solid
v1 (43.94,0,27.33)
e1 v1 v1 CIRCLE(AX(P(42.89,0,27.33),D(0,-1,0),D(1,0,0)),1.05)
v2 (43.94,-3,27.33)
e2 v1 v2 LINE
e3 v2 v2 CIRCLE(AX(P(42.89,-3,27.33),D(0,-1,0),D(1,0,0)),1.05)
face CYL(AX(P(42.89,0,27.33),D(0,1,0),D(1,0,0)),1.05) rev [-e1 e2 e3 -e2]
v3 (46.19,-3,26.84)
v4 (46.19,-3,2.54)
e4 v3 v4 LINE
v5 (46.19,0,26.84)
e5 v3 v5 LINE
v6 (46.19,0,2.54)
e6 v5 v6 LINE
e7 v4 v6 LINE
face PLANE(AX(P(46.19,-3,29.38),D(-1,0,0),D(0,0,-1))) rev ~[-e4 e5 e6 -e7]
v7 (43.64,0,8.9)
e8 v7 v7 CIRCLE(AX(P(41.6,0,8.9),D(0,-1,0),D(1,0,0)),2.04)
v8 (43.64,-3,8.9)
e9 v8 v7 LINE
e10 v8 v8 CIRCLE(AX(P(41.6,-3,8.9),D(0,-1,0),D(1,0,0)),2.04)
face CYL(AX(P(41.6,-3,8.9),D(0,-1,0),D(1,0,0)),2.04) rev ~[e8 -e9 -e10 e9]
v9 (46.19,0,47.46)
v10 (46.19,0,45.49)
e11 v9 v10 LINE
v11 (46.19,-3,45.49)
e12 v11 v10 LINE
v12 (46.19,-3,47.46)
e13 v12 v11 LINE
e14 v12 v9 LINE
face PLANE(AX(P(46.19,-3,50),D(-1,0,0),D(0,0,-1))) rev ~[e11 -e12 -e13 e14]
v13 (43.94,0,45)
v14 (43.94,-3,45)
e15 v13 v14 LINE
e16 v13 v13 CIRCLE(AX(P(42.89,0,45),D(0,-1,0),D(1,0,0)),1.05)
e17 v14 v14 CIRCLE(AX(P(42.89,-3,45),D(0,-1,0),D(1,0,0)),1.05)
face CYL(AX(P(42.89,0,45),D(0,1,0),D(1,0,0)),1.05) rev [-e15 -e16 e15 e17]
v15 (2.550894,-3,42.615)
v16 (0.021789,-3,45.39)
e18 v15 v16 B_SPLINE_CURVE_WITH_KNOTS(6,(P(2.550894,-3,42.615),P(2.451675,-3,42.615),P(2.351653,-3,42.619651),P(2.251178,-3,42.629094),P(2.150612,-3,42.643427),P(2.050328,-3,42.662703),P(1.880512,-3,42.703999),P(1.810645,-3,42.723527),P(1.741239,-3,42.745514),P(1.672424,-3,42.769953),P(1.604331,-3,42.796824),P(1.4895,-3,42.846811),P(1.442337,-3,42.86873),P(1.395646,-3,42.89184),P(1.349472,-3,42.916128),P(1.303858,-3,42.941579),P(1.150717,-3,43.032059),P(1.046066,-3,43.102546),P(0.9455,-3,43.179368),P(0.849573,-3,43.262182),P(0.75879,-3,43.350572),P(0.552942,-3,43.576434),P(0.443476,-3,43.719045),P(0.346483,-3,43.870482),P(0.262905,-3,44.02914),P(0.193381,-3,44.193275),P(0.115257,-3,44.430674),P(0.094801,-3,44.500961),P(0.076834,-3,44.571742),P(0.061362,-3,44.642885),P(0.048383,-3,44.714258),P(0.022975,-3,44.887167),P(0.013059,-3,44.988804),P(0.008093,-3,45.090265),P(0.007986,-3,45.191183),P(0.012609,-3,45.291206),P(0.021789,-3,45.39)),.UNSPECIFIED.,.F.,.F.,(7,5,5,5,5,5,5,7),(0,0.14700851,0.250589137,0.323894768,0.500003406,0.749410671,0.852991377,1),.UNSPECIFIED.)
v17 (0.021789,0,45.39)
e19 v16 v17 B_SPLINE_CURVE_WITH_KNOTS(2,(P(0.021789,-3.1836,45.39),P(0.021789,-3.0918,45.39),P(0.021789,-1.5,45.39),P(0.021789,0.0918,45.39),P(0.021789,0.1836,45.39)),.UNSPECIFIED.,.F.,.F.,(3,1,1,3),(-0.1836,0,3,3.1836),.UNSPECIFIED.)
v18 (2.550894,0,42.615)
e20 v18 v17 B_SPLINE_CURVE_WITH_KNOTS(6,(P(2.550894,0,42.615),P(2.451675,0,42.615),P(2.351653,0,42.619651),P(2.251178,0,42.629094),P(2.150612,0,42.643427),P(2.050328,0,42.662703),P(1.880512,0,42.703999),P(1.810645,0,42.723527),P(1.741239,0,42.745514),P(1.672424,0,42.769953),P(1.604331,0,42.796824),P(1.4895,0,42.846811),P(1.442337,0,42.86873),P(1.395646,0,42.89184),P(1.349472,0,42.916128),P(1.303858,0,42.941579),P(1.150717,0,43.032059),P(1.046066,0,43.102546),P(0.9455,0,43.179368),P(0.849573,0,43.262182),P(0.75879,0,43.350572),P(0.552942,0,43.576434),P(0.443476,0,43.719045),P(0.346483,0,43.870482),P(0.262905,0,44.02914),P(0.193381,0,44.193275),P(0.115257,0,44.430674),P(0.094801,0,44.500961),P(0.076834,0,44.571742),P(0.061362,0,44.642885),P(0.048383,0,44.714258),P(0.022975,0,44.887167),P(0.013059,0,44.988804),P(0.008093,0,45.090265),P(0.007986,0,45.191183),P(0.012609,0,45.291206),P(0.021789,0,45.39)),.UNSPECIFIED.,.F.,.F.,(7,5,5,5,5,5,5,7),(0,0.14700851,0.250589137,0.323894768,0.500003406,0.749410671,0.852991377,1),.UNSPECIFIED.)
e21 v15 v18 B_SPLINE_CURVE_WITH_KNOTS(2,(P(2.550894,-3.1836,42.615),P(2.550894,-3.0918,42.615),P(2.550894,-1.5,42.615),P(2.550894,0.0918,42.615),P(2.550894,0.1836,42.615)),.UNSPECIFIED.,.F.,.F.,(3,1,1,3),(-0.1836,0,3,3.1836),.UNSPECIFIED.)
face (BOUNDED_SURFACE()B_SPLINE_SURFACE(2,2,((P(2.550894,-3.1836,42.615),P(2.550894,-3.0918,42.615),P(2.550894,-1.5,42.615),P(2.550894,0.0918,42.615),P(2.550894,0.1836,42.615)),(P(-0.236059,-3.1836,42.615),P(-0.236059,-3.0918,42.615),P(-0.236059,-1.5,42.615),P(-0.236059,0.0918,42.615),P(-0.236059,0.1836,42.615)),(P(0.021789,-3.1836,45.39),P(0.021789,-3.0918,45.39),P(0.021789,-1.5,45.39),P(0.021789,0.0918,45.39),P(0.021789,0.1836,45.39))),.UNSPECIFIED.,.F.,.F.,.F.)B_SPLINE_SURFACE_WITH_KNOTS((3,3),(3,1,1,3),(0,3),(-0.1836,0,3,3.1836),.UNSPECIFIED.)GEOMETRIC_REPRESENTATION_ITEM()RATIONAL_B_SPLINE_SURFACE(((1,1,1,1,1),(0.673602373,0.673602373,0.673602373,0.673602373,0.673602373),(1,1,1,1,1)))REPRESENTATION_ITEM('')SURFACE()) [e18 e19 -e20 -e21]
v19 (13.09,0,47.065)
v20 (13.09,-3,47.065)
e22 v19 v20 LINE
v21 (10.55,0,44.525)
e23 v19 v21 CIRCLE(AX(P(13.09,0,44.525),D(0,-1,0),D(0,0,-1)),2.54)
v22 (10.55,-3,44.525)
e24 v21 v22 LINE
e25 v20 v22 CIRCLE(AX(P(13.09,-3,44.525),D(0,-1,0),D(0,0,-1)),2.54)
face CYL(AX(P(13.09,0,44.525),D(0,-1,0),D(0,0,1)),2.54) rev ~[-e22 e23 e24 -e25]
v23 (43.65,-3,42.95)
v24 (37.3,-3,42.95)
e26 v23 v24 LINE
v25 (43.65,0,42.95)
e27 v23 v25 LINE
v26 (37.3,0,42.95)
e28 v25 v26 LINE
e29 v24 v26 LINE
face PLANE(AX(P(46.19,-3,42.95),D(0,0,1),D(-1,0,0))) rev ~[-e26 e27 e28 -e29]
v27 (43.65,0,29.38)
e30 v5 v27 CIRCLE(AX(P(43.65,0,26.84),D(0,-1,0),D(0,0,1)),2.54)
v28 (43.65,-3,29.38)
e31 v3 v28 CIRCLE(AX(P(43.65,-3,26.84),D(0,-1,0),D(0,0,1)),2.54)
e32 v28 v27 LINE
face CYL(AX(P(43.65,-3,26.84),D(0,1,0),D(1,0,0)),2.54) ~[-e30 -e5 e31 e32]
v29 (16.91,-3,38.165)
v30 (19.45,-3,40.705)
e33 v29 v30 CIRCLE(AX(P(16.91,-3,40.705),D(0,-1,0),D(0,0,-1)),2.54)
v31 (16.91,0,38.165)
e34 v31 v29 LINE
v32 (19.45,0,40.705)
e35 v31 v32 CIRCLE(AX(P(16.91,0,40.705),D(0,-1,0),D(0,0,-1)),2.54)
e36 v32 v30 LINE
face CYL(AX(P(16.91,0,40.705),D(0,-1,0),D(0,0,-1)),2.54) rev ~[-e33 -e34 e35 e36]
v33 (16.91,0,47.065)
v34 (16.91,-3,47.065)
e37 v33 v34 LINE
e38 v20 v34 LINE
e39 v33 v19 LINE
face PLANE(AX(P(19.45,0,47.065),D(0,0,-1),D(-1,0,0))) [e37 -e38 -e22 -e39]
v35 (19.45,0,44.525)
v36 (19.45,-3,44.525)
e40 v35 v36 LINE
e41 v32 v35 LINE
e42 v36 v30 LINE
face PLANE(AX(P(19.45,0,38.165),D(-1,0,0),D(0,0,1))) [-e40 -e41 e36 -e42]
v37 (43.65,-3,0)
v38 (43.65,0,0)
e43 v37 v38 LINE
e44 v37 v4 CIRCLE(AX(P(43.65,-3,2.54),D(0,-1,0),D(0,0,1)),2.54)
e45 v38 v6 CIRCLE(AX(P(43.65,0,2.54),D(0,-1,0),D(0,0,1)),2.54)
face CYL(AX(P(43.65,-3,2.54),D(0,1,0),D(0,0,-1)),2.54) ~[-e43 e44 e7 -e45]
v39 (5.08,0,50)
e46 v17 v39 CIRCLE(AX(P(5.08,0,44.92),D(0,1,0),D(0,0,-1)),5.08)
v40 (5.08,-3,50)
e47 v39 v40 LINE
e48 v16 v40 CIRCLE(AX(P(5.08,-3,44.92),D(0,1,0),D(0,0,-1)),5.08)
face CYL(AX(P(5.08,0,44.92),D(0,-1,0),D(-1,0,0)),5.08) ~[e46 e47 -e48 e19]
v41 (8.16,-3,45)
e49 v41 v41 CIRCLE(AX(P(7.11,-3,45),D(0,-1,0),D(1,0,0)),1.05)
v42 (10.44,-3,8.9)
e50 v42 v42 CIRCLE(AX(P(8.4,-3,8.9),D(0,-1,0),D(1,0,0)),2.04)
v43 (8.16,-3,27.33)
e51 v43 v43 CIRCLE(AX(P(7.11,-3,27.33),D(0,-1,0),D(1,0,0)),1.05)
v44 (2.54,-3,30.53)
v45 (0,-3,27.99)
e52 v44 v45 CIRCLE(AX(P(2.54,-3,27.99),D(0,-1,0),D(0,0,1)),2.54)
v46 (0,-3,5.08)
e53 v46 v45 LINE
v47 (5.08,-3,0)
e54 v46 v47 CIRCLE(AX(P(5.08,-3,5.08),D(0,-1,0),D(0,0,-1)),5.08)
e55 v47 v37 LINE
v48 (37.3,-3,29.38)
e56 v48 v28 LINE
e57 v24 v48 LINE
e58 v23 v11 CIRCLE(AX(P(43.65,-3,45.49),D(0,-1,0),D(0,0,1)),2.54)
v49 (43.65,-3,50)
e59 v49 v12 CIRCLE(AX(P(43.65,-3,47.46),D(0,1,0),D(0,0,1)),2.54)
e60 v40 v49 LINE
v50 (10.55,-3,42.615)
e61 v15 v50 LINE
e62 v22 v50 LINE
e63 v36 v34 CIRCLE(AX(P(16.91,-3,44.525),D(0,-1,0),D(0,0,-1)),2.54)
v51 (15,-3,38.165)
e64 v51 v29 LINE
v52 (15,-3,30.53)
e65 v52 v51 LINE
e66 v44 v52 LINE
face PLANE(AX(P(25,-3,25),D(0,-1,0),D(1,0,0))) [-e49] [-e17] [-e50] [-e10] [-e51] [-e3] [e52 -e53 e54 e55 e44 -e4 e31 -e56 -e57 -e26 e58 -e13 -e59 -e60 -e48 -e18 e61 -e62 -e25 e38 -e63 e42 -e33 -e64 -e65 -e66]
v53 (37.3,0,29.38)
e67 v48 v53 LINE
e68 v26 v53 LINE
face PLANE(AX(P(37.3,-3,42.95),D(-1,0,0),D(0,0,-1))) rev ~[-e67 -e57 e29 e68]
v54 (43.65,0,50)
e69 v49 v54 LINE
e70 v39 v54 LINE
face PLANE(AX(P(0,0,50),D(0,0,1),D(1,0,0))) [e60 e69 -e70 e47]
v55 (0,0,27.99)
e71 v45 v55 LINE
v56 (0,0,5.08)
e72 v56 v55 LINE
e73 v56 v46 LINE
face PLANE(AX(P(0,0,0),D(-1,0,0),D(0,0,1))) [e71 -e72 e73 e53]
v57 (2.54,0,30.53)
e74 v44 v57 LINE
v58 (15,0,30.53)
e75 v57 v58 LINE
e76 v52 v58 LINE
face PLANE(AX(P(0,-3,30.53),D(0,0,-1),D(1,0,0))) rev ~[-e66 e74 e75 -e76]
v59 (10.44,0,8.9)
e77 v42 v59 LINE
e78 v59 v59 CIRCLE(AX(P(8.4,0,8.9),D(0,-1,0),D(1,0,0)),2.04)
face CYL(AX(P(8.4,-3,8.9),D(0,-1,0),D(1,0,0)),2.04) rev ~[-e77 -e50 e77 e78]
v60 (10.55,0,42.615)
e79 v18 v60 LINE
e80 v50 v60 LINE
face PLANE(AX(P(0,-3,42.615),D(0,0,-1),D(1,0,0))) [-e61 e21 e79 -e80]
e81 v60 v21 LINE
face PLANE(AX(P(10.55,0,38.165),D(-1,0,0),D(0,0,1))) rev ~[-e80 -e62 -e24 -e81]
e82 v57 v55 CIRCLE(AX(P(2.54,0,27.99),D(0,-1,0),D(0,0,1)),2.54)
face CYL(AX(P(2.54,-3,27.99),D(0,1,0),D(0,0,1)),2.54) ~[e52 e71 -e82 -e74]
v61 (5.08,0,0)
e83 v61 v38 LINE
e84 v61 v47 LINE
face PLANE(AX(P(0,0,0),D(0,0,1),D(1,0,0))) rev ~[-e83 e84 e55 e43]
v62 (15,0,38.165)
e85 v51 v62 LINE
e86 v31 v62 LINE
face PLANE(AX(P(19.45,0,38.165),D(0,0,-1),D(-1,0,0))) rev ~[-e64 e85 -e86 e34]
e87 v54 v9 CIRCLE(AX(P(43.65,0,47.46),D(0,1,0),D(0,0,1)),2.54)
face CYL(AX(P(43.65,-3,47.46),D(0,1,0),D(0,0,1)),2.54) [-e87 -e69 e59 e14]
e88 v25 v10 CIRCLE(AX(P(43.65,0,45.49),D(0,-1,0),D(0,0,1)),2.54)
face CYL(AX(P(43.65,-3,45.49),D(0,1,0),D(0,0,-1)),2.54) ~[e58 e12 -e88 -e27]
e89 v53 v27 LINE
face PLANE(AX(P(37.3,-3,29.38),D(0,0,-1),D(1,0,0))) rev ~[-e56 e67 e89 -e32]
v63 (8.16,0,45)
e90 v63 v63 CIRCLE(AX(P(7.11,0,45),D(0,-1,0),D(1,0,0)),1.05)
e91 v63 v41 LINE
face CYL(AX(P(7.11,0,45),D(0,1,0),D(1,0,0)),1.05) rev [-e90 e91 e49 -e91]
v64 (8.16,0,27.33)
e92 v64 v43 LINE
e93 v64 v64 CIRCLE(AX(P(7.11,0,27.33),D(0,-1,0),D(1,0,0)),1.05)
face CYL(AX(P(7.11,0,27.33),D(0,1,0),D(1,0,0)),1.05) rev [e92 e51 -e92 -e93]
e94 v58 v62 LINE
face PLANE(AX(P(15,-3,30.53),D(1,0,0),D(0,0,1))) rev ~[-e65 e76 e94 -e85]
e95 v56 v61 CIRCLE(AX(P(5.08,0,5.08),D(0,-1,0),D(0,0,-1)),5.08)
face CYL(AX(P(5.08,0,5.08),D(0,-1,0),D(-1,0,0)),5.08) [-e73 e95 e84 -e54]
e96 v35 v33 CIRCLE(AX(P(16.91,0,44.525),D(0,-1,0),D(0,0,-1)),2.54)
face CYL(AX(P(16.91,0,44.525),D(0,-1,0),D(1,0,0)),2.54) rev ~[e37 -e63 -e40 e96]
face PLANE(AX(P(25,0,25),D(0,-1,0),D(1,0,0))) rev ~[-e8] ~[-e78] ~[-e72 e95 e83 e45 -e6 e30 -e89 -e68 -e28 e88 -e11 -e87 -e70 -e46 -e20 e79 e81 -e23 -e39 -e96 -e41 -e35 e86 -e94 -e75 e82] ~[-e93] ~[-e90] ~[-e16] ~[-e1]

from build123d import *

# Parameters (mm, degrees)
F0_W     = 50
F0_H     = 50
F0_R     = 1.05
F1_DEPTH = 3
F2_W     = 15
F2_H     = 12.085
F3_DEPTH = 3.001
F4_R     = 2.04
F5_DEPTH = 3.001
F7_DEPTH = 3.001
F8_W     = 8.9
F8_H     = 8.9
F9_DEPTH = 3.001
F10_R    = 5.08
F11_R    = 2.54
F12_R    = 2.54


with BuildPart() as f1:
    # F0 (on Front) → F1 (new body)
    with BuildSketch(Plane.XZ):
        with Locations((25, 25)):
            Rectangle(F0_W, F0_H)
        with Locations((7.11, 27.33)):
            Circle(F0_R, mode=Mode.SUBTRACT)
        with Locations((7.11, 45)):
            Circle(F0_R, mode=Mode.SUBTRACT)
        with Locations((42.89, 27.33)):
            Circle(F0_R, mode=Mode.SUBTRACT)
        with Locations((42.89, 45)):
            Circle(F0_R, mode=Mode.SUBTRACT)
    extrude(amount=F1_DEPTH)

    # F2 (on face) → F3 (cut, through all)
    with BuildSketch(Plane.XZ.offset(3)):
        with Locations((7.5, 36.5725)):
            Rectangle(F2_W, F2_H)
    extrude(amount=-F3_DEPTH, mode=Mode.SUBTRACT)

    # F4 (on face) → F5 (cut, through all)
    with BuildSketch(Plane.XZ.offset(3)):
        with Locations((8.4, 8.9)):
            Circle(F4_R)
        with Locations((41.6, 8.9)):
            Circle(F4_R)
    extrude(amount=-F5_DEPTH, mode=Mode.SUBTRACT)

    # F6 (on face) → F7 (cut, through all)
    with BuildSketch(Plane.XZ.offset(3)):
        Polygon((37.3, 29.38), (46.19, 29.38), (46.19, 0), (50, 0), (50, 29.38), (50, 42.95), (50, 50), (46.19, 50), (46.19, 42.95), (37.3, 42.95), align=None)
    extrude(amount=-F7_DEPTH, mode=Mode.SUBTRACT)

    # F8 (on face) → F9 (cut, through all)
    with BuildSketch(Plane(origin=(0, 0, 0), x_dir=(-1, 0, 0), z_dir=(0, 1, 0))):
        with Locations((-15, 42.615)):
            Rectangle(F8_W, F8_H)
    extrude(amount=-F9_DEPTH, mode=Mode.SUBTRACT)

    # F10
    f10_edges = [f1.edges().sort_by_distance(p)[0] for p in [
        (0, -1.5, 50),
        (0, -1.5, 0),
    ]]
    fillet(f10_edges, radius=F10_R)

    # F11
    f11_edges = [f1.edges().sort_by_distance(p)[0] for p in [
        (19.45, -1.5, 47.065),
        (19.45, -1.5, 38.165),
        (10.55, -1.5, 47.065),
    ]]
    fillet(f11_edges, radius=F11_R)

    # F12
    f12_edges = [f1.edges().sort_by_distance(p)[0] for p in [
        (46.19, -1.5, 50),
        (46.19, -1.5, 29.38),
        (46.19, -1.5, 42.95),
        (0, -1.5, 42.615),
        (0, -1.5, 30.53),
        (46.19, -1.5, 0),
    ]]
    fillet(f12_edges, radius=F12_R)


solid = f1.part
